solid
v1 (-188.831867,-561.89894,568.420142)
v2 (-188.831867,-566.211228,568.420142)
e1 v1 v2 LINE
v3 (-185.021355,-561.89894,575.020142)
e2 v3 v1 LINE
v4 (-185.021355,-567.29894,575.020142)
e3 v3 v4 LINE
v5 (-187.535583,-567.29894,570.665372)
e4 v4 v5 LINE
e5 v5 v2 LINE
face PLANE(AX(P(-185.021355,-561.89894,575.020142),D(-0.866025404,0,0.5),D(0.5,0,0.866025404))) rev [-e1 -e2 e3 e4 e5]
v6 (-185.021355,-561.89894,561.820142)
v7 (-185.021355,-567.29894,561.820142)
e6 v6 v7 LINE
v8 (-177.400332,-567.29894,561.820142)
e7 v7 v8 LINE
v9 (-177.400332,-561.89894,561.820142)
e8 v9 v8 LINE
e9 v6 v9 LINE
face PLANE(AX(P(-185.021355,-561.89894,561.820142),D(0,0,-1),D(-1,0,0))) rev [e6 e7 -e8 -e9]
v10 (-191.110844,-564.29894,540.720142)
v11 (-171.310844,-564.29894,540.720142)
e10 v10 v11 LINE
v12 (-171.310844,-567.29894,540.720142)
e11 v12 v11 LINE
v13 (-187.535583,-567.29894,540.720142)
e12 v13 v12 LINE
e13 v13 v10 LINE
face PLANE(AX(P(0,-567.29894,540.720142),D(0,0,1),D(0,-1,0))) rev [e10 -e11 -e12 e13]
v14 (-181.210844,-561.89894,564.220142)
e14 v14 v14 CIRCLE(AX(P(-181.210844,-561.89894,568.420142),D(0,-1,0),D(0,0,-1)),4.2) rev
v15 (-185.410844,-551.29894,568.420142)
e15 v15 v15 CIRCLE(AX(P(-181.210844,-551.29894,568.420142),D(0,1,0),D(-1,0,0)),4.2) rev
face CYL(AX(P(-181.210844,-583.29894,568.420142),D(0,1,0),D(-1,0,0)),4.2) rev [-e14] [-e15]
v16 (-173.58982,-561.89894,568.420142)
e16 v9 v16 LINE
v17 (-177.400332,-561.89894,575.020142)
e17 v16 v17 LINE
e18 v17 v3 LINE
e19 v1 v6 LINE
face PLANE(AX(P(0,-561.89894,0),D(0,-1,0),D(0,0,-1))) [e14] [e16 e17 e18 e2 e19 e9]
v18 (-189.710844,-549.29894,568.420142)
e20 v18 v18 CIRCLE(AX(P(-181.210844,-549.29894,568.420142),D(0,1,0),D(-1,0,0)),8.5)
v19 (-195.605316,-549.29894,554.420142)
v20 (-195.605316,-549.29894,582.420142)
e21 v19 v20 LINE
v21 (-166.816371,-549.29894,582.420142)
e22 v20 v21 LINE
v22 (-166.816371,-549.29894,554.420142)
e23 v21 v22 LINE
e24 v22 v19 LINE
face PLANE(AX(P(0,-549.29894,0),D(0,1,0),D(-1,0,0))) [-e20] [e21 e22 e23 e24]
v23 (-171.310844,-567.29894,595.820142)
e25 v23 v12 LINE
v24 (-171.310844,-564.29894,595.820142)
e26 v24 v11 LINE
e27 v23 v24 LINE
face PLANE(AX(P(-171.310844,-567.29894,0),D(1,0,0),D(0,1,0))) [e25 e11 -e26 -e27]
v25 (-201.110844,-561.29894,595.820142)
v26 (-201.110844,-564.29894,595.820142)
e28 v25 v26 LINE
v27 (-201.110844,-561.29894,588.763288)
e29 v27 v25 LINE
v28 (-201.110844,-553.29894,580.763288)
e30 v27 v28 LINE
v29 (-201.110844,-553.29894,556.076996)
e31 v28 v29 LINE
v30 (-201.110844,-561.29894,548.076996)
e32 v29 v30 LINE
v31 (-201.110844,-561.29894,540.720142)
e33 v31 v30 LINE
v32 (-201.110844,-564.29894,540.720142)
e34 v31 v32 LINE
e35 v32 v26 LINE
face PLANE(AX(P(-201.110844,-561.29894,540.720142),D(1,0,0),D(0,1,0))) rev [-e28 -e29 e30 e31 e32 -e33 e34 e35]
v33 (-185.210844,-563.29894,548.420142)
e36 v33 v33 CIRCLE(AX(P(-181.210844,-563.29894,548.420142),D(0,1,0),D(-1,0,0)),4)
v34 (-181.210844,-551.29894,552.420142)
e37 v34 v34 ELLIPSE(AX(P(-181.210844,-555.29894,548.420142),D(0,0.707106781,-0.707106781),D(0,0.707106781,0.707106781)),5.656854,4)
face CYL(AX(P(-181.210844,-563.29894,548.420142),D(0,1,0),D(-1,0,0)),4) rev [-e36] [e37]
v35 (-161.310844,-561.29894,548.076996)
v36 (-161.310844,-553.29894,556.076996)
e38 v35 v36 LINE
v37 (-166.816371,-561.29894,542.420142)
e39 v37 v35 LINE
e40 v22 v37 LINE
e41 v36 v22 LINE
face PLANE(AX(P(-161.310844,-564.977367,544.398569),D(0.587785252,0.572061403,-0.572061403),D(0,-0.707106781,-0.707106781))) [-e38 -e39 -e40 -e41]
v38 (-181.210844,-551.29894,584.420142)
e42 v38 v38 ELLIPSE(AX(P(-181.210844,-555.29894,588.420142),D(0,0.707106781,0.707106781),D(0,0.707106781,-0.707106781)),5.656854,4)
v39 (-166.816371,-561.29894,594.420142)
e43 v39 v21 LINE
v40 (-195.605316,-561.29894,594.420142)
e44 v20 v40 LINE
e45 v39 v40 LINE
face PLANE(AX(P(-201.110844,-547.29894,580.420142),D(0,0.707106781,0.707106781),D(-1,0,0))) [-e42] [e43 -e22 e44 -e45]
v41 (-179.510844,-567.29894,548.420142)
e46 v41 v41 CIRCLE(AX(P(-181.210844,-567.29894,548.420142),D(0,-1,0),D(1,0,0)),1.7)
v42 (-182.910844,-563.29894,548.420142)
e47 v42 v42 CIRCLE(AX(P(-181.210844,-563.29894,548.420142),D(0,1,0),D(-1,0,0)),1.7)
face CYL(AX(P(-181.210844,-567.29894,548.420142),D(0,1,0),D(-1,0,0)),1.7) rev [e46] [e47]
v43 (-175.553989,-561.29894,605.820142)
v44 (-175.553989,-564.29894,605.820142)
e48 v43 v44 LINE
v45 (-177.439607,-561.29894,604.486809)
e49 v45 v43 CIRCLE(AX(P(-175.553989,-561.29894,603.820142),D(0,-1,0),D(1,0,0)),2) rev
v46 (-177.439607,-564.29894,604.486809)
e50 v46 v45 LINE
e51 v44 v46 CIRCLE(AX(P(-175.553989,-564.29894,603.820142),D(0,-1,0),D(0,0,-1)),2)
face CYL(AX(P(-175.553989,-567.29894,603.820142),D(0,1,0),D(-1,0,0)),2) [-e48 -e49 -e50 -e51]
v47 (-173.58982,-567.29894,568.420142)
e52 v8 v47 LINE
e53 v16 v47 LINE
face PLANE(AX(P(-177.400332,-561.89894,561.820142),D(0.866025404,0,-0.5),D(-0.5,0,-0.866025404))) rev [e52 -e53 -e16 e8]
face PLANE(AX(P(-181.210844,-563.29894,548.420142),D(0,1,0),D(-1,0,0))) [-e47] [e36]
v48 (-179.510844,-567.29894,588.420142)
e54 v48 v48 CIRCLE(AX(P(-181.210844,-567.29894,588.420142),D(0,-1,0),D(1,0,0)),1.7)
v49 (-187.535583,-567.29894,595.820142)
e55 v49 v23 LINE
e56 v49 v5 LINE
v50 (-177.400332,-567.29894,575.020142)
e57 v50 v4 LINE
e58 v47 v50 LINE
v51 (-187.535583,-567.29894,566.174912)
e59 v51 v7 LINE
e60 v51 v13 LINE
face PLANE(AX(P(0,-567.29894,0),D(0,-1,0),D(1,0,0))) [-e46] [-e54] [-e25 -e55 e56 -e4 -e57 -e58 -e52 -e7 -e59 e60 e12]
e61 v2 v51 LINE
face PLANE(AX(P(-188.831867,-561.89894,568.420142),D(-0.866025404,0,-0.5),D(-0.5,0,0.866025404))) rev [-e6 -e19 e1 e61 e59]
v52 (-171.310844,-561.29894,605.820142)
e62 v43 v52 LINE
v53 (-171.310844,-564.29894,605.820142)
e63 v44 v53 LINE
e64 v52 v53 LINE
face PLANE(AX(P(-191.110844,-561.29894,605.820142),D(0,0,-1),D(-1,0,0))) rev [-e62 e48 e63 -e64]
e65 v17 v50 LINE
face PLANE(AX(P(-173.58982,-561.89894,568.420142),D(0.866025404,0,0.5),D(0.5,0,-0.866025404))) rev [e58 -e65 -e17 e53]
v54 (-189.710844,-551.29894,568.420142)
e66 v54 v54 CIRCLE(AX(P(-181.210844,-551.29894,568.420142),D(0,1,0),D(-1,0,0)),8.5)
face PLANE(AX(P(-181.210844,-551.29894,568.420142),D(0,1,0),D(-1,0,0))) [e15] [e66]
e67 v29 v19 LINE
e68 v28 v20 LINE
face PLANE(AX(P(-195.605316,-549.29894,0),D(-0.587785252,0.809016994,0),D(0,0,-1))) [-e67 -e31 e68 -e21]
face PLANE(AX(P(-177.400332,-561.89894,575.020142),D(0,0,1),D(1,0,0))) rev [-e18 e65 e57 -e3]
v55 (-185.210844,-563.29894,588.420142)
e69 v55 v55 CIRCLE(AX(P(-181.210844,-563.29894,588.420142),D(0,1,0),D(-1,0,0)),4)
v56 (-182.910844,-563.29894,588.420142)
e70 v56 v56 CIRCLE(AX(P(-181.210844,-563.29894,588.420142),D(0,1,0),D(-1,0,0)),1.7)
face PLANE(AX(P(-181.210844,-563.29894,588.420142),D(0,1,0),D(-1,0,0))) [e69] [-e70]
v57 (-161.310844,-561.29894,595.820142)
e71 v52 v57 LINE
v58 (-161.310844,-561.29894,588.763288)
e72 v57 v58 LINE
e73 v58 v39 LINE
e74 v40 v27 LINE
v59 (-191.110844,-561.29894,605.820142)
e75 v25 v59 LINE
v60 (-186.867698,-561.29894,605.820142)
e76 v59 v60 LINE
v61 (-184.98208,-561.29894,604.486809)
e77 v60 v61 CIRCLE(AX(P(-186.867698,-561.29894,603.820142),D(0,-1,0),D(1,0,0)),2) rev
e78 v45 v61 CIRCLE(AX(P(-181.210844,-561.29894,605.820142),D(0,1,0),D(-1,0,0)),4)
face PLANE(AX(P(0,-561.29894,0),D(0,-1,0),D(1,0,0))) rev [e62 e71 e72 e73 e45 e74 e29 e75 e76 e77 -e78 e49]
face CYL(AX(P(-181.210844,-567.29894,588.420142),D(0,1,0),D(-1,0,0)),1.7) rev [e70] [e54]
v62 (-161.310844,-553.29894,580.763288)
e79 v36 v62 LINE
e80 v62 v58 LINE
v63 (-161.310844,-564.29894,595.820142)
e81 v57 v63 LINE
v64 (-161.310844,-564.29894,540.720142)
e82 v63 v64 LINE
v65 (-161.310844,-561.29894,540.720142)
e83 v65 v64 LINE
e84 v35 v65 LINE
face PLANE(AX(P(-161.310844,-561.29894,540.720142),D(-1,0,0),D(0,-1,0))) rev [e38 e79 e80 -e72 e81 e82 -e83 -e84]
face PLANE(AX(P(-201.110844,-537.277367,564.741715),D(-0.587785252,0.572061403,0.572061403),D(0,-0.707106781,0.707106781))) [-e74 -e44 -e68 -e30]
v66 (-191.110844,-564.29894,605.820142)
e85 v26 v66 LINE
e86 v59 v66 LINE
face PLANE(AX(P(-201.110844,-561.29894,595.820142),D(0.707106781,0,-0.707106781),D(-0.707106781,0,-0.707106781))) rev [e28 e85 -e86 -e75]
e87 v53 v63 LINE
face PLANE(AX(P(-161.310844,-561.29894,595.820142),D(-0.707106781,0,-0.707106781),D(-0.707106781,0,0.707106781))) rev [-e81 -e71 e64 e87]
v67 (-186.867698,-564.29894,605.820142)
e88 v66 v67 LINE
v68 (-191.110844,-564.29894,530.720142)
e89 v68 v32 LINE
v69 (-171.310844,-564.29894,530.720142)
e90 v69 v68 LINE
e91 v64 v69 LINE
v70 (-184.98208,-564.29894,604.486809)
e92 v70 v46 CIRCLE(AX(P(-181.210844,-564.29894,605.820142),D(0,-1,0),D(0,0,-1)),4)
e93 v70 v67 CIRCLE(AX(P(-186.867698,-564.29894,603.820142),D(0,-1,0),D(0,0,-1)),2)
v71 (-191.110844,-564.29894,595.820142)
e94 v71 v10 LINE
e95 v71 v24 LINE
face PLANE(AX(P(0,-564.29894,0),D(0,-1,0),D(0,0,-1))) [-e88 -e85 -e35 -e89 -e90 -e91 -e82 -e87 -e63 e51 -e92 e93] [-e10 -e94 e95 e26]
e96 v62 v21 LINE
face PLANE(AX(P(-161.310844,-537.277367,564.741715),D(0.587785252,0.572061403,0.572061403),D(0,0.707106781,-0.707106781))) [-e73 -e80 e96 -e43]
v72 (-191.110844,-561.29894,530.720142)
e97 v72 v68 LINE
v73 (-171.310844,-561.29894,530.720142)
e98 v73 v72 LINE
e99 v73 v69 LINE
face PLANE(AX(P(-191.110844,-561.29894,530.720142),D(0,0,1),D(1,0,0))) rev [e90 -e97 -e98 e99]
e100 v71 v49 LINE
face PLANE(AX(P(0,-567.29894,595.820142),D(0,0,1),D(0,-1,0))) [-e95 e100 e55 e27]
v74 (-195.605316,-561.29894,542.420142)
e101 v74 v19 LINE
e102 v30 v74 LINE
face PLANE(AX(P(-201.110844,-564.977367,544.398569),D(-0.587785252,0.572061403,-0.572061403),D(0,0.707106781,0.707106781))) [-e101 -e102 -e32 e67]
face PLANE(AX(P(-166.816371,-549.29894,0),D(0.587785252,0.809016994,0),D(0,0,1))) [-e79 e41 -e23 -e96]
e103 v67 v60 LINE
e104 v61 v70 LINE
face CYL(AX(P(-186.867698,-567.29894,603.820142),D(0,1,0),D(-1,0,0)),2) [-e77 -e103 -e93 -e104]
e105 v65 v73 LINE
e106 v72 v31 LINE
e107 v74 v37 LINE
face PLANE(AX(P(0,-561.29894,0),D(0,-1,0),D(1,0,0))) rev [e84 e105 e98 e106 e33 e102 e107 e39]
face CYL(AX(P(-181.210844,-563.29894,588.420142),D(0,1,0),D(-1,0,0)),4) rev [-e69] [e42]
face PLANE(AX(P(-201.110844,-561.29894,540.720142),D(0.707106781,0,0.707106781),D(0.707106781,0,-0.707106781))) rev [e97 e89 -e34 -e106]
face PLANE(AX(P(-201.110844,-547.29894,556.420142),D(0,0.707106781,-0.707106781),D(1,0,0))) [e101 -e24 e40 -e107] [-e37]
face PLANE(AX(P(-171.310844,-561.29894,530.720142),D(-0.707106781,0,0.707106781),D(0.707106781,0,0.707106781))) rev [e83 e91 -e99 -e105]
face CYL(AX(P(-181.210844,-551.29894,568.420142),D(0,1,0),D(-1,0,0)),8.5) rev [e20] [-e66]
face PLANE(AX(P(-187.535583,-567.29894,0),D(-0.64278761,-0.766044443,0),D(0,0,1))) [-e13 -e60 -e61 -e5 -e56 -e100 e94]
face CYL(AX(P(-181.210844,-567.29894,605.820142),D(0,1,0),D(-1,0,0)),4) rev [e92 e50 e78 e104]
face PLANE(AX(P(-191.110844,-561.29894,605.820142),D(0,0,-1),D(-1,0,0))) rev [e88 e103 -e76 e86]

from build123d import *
from OCP.BRepFilletAPI import BRepFilletAPI_MakeChamfer

# Parameters (mm, degrees)
SKETCH1_W           = 12.900022784
SKETCH1_H           = 55.1
SKETCH1_R           = 1.7
SKETCH1_W_2         = 6.899977216
BOSS_EXTRUDE1_DEPTH = 6
SKETCH2_R           = 2.1
BOSS_EXTRUDE2_DEPTH = 3
CHAMFER2_SIZE2      = 3
CHAMFER2_SIZE       = 3.575260778
SKETCH3_W           = 39.8
SKETCH3_H           = 24
BOSS_EXTRUDE3_DEPTH = 12
SKETCH5_R           = 4.2
CUT_EXTRUDE2_DEPTH  = 34
SKETCH7_R           = 4
CUT_EXTRUDE4_DEPTH  = 2
SKETCH10_R          = 4
CUT_EXTRUDE5_DEPTH  = 6
FILLET2_R           = 2
CUT_EXTRUDE6_DEPTH  = 5.4
CHAMFER3_SIZE       = 14
CHAMFER4_SIZE       = 4
CHAMFER4_SIZE2      = 5.505527682
SKETCH12_R          = 8.5
CUT_EXTRUDE7_DEPTH  = 2


# Some blends are built 0.0001 mm under size
with BuildPart() as part:
    # Sketch1 → Boss-Extrude1 (new body)
    # profile 1 of 2: a face of its own
    with BuildSketch(Plane.XZ.offset(561.298939869)):
        with Locations((-177.760855006, 568.270141885)):
            Rectangle(SKETCH1_W, SKETCH1_H)
        with Locations((-181.210843614, 548.420141885)):
            Circle(SKETCH1_R, mode=Mode.SUBTRACT)
        with Locations((-181.210843614, 588.420141885)):
            Circle(SKETCH1_R, mode=Mode.SUBTRACT)
    # profile 2 of 2: a face of its own
    with BuildSketch(Plane.XZ.offset(561.298939869)):
        with Locations((-187.660855006, 568.270141885)):
            Rectangle(SKETCH1_W_2, SKETCH1_H)
    extrude(amount=BOSS_EXTRUDE1_DEPTH)

    # Sketch2 → Boss-Extrude2 (add)
    with BuildSketch(Plane(origin=(0, -564.298939869, 0), x_dir=(1, 0, 0), z_dir=(0, 1, 0))):
        Polygon((-191.110843614, -530.720141885), (-171.310843614, -530.720141885), (-161.310843614, -540.720141885), (-161.310843614, -595.820141885), (-171.310843614, -605.820141885), (-191.110843614, -605.820141885), (-201.110843614, -595.820141885), (-201.110843614, -540.720141885), align=None)
        with Locations((-181.210843614, -548.420141885)):
            Circle(SKETCH2_R, mode=Mode.SUBTRACT)
        with Locations((-181.210843614, -588.420141885)):
            Circle(SKETCH2_R, mode=Mode.SUBTRACT)
    extrude(amount=BOSS_EXTRUDE2_DEPTH)

    # Chamfer2
    chamfer2_edges = [part.edges().sort_by_distance(p)[0] for p in [
        (-191.110843614, -567.298939869, 568.270141885),
    ]]
    chamfer2_side = [part.faces().sort_by_distance(p)[0] for p in [
        (-191.050843614, -567.298939869, 568.270141885),
    ]]
    chamfer(chamfer2_edges, length=CHAMFER2_SIZE - 0.0001, length2=CHAMFER2_SIZE2 - 0.0001, reference=chamfer2_side[0])  # a hair under: the kernel refuses the full size

    # Sketch3 → Boss-Extrude3 (add)
    with BuildSketch(Plane(origin=(0, -561.298939869, 0), x_dir=(1, 0, 0), z_dir=(0, 1, 0))):
        with Locations((-181.210843614, -568.420141885)):
            Rectangle(SKETCH3_W, SKETCH3_H)
    extrude(amount=BOSS_EXTRUDE3_DEPTH)

    # Sketch5 → Cut-Extrude2 (cut)
    with BuildSketch(Plane(origin=(0, -549.298939869, 0), x_dir=(1, 0, 0), z_dir=(0, 1, 0))):
        with Locations(Location((-181.210843614, -568.420141885, 0), (0, 0, 180))):
            Circle(SKETCH5_R)
    extrude(amount=-CUT_EXTRUDE2_DEPTH, mode=Mode.SUBTRACT)

    # Sketch7 → Cut-Extrude4 (cut)
    with BuildSketch(Plane(origin=(0, -561.298939869, 0), x_dir=(1, 0, 0), z_dir=(0, 1, 0))):
        with Locations(Location((-181.210843614, -548.420141885, 0), (0, 0, 180))):
            Circle(SKETCH7_R)
        with Locations(Location((-181.210843614, -588.420141885, 0), (0, 0, 180))):
            Circle(SKETCH7_R)
    extrude(amount=-CUT_EXTRUDE4_DEPTH, mode=Mode.SUBTRACT)

    # Sketch10 → Cut-Extrude5 (cut)
    with BuildSketch(Plane(origin=(0, -561.298939869, 0), x_dir=(1, 0, 0), z_dir=(0, 1, 0))):
        with Locations((-181.210843614, -605.820141885)):
            Circle(SKETCH10_R)
    extrude(amount=-CUT_EXTRUDE5_DEPTH, mode=Mode.SUBTRACT)

    # Fillet2
    fillet2_edges = [part.edges().sort_by_distance(p)[0] for p in [
        (-177.210843614, -562.798939869, 605.820141885),
        (-185.210843614, -562.798939869, 605.820141885),
    ]]
    fillet(fillet2_edges, radius=FILLET2_R)

    # Sketch11 → Cut-Extrude6 (cut)
    with BuildSketch(Plane.XZ.offset(567.298939869)):
        Polygon((-185.02135539, 575.020141885), (-188.831867167, 568.420141885), (-185.02135539, 561.820141885), (-177.400331837, 561.820141885), (-173.58982006, 568.420141885), (-177.400331837, 575.020141885), align=None)
    extrude(amount=-CUT_EXTRUDE6_DEPTH, mode=Mode.SUBTRACT)

    # Chamfer3
    # the kernel refuses this chamfer: 14 mm, written as the material it adds along each edge
    with BuildSketch(Plane(origin=(-161.310843614, -561.298939869, 580.420141885), x_dir=(0, -0.027495876610589963, 0.9996219169112966), z_dir=(-1, 0, 0))) as chamfer3_piece_1_section:
        Polygon((CHAMFER3_SIZE * 0.999621916911, CHAMFER3_SIZE * 0.0274958766106), (-CHAMFER3_SIZE * 0.0274958766106, CHAMFER3_SIZE * 0.999621916911), (0, 0), align=None)
    chamfer3_piece_1 = extrude(amount=39.8, mode=Mode.PRIVATE)
    chamfer3_piece_1 = chamfer3_piece_1 - Plane(origin=(-181.210843614, -559.739674618, 588.420141885), x_dir=(-1, 0, 0), z_dir=(0, 1, 0)) * Cylinder(4, 136, mode=Mode.PRIVATE)
    chamfer3_piece_1 = split(chamfer3_piece_1, bisect_by=Plane(origin=(-194.47751028, -549.298939869, 592.639373465), z_dir=(0, -1, 0)), keep=Keep.TOP, mode=Mode.PRIVATE)
    add(chamfer3_piece_1)
    with BuildSketch(Plane(origin=(-201.110843614, -561.298939869, 556.420141885), x_dir=(3.206917197373746e-15, 0.9996219169112968, 0.027495876610589966), z_dir=(1, 0, 0))) as chamfer3_piece_2_section:
        Polygon((CHAMFER3_SIZE * 0.999621916911, -CHAMFER3_SIZE * 0.0274958766106), (-CHAMFER3_SIZE * 0.0274958766106, -CHAMFER3_SIZE * 0.999621916911), (0, 0), align=None)
    chamfer3_piece_2 = extrude(amount=39.8, mode=Mode.PRIVATE)
    chamfer3_piece_2 = split(chamfer3_piece_2, bisect_by=Plane(origin=(-167.944176947, -549.298939869, 552.464896655), z_dir=(0, -1, 0)), keep=Keep.TOP, mode=Mode.PRIVATE)
    chamfer3_piece_2 = chamfer3_piece_2 - Plane(origin=(-181.210843614, -551.475687905, 548.420141885), x_dir=(-1, 0, 0), z_dir=(0, 1, 0)) * Cylinder(4, 136, mode=Mode.PRIVATE)
    add(chamfer3_piece_2)

    # Chamfer4: one chamfer whose edges measure the first distance from different faces: ONE call of the kernel's chamfer builder (chamfer() names one face for all edges)
    chamfer4_edges_1 = [part.edges().sort_by_distance(p)[0] for p in [
        (-161.310843614, -555.298939869, 588.420141885),
        (-161.310843614, -555.298939869, 548.420141885),
        (-161.310843614, -549.298939869, 568.420141885),
    ]]
    chamfer4_side_1 = [part.faces().sort_by_distance(p)[0] for p in [
        (-161.310843614, -557.666443356, 568.381717896),
    ]]
    chamfer4_edges_2 = [part.edges().sort_by_distance(p)[0] for p in [
        (-201.110843614, -555.298939869, 588.420141885),
        (-201.110843614, -555.298939869, 548.420141885),
        (-201.110843614, -549.298939869, 568.420141885),
    ]]
    chamfer4_side_2 = [part.faces().sort_by_distance(p)[0] for p in [
        (-201.110843614, -557.666443356, 568.381717896),
    ]]
    chamfer4 = BRepFilletAPI_MakeChamfer(part.part.solid().wrapped)
    for e in chamfer4_edges_1:
        chamfer4.Add(CHAMFER4_SIZE, CHAMFER4_SIZE2, e.wrapped, chamfer4_side_1[0].wrapped)  # the first distance lies on this face
    for e in chamfer4_edges_2:
        chamfer4.Add(CHAMFER4_SIZE, CHAMFER4_SIZE2, e.wrapped, chamfer4_side_2[0].wrapped)  # the first distance lies on this face
    add(Compound.cast(chamfer4.Shape()), mode=Mode.REPLACE)

    # Sketch12 → Cut-Extrude7 (cut)
    with BuildSketch(Plane(origin=(0, -549.298939869, 0), x_dir=(1, 0, 0), z_dir=(0, 1, 0))):
        with Locations(Location((-181.210843614, -568.420141885, 0), (0, 0, 180))):
            Circle(SKETCH12_R)
    extrude(amount=-CUT_EXTRUDE7_DEPTH, mode=Mode.SUBTRACT)


solid = part.part
